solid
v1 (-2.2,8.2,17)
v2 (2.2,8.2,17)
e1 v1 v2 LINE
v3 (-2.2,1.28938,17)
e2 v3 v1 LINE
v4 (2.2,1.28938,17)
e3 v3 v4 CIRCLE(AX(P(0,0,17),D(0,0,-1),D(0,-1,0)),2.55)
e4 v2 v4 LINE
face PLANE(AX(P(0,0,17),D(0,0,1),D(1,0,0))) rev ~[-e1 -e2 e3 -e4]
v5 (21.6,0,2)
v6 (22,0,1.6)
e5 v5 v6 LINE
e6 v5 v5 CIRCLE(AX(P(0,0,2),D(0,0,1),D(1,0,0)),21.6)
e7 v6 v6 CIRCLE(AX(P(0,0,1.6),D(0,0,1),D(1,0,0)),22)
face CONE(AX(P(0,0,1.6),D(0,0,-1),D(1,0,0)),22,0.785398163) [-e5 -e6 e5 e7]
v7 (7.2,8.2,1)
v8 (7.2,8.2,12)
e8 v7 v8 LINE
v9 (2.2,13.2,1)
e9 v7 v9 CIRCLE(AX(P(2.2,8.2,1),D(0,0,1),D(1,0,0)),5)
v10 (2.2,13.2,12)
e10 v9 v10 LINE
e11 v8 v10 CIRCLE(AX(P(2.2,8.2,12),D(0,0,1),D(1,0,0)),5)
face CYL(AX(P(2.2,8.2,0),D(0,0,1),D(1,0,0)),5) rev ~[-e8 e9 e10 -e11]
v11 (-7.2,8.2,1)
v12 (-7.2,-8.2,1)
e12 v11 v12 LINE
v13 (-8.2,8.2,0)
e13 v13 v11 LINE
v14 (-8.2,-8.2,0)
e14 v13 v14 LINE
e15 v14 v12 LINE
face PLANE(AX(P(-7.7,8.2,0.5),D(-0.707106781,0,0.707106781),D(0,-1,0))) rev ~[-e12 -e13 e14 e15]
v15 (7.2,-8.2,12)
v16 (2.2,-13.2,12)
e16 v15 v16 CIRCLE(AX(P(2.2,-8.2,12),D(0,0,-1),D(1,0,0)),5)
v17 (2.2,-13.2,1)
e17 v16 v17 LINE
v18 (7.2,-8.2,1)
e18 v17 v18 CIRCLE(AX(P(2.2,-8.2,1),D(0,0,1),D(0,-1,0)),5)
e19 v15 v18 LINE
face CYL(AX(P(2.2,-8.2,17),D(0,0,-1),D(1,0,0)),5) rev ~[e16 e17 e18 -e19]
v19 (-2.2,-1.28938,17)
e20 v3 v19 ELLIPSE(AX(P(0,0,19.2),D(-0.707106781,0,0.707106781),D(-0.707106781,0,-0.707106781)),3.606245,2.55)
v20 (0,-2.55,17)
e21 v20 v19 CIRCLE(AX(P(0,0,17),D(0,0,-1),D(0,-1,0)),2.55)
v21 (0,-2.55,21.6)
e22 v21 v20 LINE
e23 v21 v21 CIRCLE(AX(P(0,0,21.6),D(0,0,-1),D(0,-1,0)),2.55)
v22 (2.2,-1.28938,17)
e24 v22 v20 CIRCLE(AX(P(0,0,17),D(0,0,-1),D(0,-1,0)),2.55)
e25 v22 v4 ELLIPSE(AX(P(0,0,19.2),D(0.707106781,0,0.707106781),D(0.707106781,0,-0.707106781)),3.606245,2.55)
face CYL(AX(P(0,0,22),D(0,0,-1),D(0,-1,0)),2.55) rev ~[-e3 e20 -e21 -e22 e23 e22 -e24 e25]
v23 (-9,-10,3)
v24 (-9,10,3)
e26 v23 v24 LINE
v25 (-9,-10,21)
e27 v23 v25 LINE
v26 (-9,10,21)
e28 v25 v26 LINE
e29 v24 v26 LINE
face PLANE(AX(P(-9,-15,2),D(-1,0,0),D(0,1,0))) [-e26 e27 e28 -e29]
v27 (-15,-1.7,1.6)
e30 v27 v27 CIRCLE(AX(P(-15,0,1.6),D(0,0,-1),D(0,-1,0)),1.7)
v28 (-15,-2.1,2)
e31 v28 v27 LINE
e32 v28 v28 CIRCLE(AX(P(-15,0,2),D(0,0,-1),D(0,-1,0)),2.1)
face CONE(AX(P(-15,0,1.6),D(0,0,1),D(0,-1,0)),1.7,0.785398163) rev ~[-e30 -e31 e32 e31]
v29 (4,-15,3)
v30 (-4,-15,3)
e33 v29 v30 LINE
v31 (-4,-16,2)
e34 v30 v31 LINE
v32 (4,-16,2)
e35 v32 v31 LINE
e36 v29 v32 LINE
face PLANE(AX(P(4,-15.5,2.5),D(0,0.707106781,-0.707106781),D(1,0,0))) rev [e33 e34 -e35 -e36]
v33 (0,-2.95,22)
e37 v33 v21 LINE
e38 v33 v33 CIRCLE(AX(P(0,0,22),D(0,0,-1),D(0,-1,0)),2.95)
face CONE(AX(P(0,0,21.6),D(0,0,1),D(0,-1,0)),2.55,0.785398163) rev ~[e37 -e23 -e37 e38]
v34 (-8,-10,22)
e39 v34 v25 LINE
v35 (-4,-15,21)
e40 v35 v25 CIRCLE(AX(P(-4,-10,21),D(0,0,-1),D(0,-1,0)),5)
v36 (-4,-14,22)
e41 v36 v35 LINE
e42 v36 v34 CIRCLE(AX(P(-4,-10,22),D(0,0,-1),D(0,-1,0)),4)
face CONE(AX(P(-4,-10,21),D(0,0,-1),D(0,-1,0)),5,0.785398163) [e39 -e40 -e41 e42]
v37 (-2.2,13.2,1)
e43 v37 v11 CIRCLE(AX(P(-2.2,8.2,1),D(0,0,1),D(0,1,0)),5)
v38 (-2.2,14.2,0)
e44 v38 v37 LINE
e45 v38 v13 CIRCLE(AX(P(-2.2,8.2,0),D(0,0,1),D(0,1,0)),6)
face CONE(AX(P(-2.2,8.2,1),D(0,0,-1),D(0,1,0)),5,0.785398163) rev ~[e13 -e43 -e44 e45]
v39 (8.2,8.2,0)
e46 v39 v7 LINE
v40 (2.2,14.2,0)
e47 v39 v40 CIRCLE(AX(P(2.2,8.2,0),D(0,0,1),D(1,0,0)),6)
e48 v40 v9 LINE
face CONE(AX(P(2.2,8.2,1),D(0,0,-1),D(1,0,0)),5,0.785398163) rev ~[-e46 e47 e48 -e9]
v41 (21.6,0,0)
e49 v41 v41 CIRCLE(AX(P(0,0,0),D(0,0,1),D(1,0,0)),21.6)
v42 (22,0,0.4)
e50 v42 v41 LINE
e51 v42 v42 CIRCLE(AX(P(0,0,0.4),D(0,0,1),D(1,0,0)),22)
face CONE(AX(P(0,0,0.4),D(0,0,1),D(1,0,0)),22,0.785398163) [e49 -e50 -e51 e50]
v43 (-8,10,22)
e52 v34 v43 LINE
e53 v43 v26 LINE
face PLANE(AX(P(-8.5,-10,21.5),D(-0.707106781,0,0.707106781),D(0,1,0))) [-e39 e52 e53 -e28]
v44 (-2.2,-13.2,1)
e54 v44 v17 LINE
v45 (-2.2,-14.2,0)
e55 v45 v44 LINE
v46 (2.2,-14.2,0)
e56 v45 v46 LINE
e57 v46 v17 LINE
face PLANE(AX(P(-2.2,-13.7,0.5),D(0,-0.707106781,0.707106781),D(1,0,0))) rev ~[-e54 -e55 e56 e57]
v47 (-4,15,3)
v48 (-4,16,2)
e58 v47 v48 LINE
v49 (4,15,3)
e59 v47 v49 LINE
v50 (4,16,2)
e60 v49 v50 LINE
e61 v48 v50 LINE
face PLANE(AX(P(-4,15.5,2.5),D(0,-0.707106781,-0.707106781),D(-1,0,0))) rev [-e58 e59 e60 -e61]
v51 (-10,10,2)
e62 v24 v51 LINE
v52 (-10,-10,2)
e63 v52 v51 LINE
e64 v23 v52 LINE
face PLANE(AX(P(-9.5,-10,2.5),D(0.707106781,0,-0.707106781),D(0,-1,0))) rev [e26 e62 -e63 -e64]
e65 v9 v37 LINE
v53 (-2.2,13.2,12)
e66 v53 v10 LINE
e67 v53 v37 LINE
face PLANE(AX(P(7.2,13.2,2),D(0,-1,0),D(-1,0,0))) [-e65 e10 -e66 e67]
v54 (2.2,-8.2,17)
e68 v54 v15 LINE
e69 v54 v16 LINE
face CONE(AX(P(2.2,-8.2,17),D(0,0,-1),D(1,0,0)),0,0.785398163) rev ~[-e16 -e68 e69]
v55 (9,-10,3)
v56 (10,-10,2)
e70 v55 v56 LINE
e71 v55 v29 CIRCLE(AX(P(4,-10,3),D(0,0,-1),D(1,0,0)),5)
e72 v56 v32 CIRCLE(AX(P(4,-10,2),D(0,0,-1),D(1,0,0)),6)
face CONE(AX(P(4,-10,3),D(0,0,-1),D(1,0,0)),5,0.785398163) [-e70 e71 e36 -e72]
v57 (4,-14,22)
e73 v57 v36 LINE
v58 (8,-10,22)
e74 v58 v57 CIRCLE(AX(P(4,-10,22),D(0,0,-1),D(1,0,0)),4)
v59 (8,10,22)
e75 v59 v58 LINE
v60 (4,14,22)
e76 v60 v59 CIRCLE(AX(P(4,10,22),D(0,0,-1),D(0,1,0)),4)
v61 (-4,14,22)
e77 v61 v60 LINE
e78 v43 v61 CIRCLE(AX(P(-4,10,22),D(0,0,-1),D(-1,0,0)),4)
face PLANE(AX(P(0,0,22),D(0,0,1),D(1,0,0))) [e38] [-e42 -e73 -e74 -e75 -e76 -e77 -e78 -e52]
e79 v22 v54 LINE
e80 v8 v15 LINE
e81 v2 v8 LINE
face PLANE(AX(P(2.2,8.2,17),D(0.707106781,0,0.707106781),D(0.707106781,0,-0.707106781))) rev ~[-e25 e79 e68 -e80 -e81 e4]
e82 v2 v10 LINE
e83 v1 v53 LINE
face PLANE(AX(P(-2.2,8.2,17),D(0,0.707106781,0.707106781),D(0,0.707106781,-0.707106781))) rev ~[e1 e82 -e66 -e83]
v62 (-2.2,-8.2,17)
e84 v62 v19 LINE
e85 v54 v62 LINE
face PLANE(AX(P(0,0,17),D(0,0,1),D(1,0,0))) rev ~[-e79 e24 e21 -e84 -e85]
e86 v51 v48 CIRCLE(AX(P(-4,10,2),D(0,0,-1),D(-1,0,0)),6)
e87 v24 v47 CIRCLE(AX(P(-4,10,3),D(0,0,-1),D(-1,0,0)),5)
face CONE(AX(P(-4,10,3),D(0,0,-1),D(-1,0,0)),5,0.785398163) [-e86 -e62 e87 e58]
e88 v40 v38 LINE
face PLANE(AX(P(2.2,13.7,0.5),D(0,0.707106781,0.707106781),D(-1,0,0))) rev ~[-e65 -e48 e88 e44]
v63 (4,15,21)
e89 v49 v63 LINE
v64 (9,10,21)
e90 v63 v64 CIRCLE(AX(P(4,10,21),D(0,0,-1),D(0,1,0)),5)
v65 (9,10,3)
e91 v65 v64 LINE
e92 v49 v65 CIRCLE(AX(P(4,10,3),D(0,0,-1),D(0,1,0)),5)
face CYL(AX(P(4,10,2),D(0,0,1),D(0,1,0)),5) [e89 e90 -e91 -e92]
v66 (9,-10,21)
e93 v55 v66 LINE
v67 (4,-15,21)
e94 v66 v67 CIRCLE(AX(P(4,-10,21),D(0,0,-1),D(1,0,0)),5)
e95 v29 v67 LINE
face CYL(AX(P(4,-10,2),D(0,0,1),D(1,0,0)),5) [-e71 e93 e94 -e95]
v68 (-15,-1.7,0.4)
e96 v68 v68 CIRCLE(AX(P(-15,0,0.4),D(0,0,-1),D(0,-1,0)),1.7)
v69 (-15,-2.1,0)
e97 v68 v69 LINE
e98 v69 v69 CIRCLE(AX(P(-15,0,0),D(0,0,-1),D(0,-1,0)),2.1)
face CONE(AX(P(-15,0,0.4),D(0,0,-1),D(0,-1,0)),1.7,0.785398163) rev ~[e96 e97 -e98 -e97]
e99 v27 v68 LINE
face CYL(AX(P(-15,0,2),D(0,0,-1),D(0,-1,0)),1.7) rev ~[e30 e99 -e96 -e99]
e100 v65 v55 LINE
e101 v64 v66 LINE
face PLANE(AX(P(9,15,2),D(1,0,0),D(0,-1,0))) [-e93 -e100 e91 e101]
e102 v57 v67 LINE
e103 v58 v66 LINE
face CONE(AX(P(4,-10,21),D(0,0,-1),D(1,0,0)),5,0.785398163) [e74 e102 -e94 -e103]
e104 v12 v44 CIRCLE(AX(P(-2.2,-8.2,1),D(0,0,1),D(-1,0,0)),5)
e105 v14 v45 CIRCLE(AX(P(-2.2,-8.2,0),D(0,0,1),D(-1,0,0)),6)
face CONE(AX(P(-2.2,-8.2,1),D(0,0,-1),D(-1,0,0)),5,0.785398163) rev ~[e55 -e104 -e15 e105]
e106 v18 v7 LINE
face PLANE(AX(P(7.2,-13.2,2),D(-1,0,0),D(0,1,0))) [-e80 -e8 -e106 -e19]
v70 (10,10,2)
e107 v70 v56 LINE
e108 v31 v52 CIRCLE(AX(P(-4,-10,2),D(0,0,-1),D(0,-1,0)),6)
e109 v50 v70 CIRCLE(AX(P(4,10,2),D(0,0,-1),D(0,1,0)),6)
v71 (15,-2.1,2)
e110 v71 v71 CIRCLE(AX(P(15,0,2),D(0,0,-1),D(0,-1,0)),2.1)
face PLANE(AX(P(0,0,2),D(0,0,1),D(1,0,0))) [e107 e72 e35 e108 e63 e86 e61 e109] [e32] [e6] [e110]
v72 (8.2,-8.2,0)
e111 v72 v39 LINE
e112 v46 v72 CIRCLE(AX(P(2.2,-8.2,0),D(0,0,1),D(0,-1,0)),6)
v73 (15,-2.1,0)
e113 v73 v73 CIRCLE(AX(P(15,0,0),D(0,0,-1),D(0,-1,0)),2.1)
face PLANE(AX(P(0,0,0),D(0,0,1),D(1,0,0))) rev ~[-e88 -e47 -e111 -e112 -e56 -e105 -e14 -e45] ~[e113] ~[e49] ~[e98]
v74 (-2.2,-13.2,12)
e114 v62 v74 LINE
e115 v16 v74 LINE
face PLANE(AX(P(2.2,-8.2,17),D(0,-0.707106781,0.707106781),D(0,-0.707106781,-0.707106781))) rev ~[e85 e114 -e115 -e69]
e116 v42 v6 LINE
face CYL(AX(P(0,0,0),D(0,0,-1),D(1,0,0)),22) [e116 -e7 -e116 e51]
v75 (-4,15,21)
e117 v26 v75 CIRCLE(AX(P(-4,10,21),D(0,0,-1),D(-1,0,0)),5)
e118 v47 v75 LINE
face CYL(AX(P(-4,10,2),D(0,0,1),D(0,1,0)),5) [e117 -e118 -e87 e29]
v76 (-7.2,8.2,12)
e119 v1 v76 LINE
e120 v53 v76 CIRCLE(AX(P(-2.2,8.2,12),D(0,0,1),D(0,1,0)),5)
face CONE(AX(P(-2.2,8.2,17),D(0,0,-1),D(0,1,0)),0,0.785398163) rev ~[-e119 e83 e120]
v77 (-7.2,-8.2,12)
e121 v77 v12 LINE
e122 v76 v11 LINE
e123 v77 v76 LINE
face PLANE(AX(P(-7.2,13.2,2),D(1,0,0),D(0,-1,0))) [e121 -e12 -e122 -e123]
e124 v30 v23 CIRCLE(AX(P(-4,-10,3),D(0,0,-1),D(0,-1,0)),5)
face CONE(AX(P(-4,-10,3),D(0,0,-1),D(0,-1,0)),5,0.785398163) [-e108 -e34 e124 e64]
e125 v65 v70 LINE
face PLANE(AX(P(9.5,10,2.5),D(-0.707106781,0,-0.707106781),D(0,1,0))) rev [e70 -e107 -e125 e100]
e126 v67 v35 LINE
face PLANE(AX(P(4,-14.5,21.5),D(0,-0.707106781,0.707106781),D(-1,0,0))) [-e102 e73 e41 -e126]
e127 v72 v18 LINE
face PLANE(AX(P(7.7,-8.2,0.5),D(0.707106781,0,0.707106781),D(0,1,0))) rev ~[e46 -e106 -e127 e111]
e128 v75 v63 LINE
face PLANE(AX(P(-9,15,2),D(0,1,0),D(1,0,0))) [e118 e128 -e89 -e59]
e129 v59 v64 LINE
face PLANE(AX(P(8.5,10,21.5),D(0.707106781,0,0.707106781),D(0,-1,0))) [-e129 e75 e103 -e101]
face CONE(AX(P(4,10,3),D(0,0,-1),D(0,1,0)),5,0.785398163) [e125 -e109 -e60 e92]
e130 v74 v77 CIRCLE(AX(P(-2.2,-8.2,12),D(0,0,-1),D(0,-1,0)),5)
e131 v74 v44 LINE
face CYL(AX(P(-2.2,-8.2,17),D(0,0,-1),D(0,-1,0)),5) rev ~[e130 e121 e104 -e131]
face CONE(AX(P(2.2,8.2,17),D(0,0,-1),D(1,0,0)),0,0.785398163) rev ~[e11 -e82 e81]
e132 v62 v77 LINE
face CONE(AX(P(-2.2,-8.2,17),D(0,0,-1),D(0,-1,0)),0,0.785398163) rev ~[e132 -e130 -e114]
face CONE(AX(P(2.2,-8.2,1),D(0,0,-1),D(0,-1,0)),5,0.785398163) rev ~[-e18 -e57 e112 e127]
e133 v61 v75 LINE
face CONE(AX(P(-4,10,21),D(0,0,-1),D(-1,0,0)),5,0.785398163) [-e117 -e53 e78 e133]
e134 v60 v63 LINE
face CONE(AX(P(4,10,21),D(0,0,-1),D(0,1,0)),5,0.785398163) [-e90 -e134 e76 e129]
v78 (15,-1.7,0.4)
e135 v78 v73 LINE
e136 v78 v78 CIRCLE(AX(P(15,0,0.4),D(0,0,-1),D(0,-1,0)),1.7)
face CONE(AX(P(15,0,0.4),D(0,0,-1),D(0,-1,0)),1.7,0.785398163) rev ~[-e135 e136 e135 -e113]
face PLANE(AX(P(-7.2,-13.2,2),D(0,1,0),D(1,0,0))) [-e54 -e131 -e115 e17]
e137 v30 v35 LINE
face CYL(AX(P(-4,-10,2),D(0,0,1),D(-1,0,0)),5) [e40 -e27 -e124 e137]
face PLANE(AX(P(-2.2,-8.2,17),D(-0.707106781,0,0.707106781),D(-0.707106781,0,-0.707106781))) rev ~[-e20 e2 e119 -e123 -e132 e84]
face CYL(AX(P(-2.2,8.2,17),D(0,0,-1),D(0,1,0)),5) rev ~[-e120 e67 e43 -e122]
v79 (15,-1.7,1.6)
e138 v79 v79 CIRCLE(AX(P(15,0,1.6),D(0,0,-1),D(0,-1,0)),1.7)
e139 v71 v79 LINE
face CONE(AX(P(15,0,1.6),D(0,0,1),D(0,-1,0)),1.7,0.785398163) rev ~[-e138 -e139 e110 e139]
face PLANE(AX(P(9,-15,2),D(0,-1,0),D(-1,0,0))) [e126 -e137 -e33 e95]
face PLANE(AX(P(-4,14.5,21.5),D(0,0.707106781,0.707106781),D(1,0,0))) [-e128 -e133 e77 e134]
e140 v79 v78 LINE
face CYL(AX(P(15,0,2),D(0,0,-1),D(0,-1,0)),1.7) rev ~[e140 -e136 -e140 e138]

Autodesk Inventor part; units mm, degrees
ref_plane "YZ Plane" through (0, 0, 0) normal (1, 0, 0) x (0, 1, 0)
ref_plane "XZ Plane" through (0, 0, 0) normal (0, 1, 0) x (-1, 0, 0)
ref_plane "XY Plane" through (0, 0, 0) normal (0, 0, 1) x (1, 0, 0)
sketch "Sketch1" plane through (0, 0, 0) normal (0, 0, 1) x (1, 0, 0)
  circle A0 centre (0, 0) radius 22
  dimension "d0" = 44
extrude "Extrusion1" add sketch "Sketch1" along normal blind 2
sketch "Sketch2" plane through (0, 0, 2) normal (0, 0, 1) x (1, 0, 0)
  line L0 (-15, 0) -> (15, 0) construction
  point P0 (0, 0)
  point P1 (0, 0)
  dimension "d3" = 30
hole "Hole1" at (-15, 0, 2) at (15, 0, 2) direction (0, 0, -1) diameter 3.4 end through all
sketch "Sketch3" plane through (0, 0, 2) normal (0, 0, 1) x (1, 0, 0)
  line L0 (-9, 15) -> (9, 15)
  line L1 (9, 15) -> (9, -15)
  line L2 (9, -15) -> (-9, -15)
  line L3 (-9, -15) -> (-9, 15)
  line L4 (7.2, 13.2) -> (-7.2, 13.2)
  line L5 (-7.2, 13.2) -> (-7.2, -13.2)
  line L6 (-7.2, -13.2) -> (7.2, -13.2)
  line L7 (7.2, -13.2) -> (7.2, 13.2)
  point P0 (0, 0)
  point P1 (9, 0)
  point P2 (0, 15)
  dimension "d11" = 30
  dimension "d12" = 18
  dimension "d13" = 1.8
extrude "Extrusion2" cut sketch "Sketch3" against normal blind 2 contours L7 L6 L5 L4
extrude "Extrusion3" add sketch "Sketch3" along normal blind 20
sketch "Sketch4" plane through (0, 0, 22) normal (0, 0, 1) x (1, 0, 0)
  line L0 (-9, -15) -> (9, -15) projected
  line L1 (9, -15) -> (9, 15) projected
  line L2 (9, 15) -> (-9, 15) projected
  line L3 (-9, 15) -> (-9, -15) projected
  line L4 (7.2, 13.2) -> (7.2, -13.2) projected
  line L5 (7.2, -13.2) -> (-7.2, -13.2) projected
  line L6 (-7.2, -13.2) -> (-7.2, 13.2) projected
  line L7 (-7.2, 13.2) -> (7.2, 13.2) projected
  point P0 (0, 0)
extrude "Extrusion4" add sketch "Sketch4" against normal blind 5 contours L4 L5 L6 L7
sketch "Sketch5" plane through (0, 0, 22) normal (0, 0, 1) x (1, 0, 0)
  point P0 (0, 0)
  point P1 (0, 0)
hole "Hole2" at (0, 0, 22) direction (0, 0, -1) diameter 5.1 end through all
fillet "Fillet1" radius 5 8 edges at (-7.2, -13.2, 8.5) (7.2, -13.2, 8.5) (-7.2, 13.2, 8.5) (7.2, 13.2, 8.5) (9, 15, 12) (-9, 15, 12) (-9, -15, 12) (9, -15, 12)
chamfer "Chamfer1" distance 5 angle 45 8 edges at (0, 13.2, 17) (-5.7355, 11.7355, 17) (-7.2, 0, 17) (-5.7355, -11.7355, 17) (0, -13.2, 17) (5.7355, -11.7355, 17) (7.2, 0, 17) (5.7355, 11.7355, 17)
chamfer "Chamfer2" distance 1 angle 45 24 edges at (0, 15, 22) (-7.5355, 13.5355, 22) (-9, 0, 22) (-7.5355, -13.5355, 22) (0, -15, 22) (7.5355, -13.5355, 22) (9, 0, 22) (7.5355, 13.5355, 22) (9, 0, 2) (7.5355, -13.5355, 2) (0, -15, 2) (-7.5355, -13.5355, 2) (-9, 0, 2) (-7.5355, 13.5355, 2) (0, 15, 2) (7.5355, 13.5355, 2) (7.2, 0, 0) (5.7355, 11.7355, 0) (0, 13.2, 0) (-5.7355, 11.7355, 0) (-7.2, 0, 0) (-5.7355, -11.7355, 0) (0, -13.2, 0) (5.7355, -11.7355, 0)
chamfer "Chamfer3" distance 0.4 angle 45 7 edges at (-22, 0, 2) (-22, 0, 0) (15, 1.7, 2) (-15, 1.7, 2) (-15, 1.7, 0) (15, 1.7, 0) (0, 2.55, 22)
properties part number "takumar-slit-led" material "ABS Plastic"
